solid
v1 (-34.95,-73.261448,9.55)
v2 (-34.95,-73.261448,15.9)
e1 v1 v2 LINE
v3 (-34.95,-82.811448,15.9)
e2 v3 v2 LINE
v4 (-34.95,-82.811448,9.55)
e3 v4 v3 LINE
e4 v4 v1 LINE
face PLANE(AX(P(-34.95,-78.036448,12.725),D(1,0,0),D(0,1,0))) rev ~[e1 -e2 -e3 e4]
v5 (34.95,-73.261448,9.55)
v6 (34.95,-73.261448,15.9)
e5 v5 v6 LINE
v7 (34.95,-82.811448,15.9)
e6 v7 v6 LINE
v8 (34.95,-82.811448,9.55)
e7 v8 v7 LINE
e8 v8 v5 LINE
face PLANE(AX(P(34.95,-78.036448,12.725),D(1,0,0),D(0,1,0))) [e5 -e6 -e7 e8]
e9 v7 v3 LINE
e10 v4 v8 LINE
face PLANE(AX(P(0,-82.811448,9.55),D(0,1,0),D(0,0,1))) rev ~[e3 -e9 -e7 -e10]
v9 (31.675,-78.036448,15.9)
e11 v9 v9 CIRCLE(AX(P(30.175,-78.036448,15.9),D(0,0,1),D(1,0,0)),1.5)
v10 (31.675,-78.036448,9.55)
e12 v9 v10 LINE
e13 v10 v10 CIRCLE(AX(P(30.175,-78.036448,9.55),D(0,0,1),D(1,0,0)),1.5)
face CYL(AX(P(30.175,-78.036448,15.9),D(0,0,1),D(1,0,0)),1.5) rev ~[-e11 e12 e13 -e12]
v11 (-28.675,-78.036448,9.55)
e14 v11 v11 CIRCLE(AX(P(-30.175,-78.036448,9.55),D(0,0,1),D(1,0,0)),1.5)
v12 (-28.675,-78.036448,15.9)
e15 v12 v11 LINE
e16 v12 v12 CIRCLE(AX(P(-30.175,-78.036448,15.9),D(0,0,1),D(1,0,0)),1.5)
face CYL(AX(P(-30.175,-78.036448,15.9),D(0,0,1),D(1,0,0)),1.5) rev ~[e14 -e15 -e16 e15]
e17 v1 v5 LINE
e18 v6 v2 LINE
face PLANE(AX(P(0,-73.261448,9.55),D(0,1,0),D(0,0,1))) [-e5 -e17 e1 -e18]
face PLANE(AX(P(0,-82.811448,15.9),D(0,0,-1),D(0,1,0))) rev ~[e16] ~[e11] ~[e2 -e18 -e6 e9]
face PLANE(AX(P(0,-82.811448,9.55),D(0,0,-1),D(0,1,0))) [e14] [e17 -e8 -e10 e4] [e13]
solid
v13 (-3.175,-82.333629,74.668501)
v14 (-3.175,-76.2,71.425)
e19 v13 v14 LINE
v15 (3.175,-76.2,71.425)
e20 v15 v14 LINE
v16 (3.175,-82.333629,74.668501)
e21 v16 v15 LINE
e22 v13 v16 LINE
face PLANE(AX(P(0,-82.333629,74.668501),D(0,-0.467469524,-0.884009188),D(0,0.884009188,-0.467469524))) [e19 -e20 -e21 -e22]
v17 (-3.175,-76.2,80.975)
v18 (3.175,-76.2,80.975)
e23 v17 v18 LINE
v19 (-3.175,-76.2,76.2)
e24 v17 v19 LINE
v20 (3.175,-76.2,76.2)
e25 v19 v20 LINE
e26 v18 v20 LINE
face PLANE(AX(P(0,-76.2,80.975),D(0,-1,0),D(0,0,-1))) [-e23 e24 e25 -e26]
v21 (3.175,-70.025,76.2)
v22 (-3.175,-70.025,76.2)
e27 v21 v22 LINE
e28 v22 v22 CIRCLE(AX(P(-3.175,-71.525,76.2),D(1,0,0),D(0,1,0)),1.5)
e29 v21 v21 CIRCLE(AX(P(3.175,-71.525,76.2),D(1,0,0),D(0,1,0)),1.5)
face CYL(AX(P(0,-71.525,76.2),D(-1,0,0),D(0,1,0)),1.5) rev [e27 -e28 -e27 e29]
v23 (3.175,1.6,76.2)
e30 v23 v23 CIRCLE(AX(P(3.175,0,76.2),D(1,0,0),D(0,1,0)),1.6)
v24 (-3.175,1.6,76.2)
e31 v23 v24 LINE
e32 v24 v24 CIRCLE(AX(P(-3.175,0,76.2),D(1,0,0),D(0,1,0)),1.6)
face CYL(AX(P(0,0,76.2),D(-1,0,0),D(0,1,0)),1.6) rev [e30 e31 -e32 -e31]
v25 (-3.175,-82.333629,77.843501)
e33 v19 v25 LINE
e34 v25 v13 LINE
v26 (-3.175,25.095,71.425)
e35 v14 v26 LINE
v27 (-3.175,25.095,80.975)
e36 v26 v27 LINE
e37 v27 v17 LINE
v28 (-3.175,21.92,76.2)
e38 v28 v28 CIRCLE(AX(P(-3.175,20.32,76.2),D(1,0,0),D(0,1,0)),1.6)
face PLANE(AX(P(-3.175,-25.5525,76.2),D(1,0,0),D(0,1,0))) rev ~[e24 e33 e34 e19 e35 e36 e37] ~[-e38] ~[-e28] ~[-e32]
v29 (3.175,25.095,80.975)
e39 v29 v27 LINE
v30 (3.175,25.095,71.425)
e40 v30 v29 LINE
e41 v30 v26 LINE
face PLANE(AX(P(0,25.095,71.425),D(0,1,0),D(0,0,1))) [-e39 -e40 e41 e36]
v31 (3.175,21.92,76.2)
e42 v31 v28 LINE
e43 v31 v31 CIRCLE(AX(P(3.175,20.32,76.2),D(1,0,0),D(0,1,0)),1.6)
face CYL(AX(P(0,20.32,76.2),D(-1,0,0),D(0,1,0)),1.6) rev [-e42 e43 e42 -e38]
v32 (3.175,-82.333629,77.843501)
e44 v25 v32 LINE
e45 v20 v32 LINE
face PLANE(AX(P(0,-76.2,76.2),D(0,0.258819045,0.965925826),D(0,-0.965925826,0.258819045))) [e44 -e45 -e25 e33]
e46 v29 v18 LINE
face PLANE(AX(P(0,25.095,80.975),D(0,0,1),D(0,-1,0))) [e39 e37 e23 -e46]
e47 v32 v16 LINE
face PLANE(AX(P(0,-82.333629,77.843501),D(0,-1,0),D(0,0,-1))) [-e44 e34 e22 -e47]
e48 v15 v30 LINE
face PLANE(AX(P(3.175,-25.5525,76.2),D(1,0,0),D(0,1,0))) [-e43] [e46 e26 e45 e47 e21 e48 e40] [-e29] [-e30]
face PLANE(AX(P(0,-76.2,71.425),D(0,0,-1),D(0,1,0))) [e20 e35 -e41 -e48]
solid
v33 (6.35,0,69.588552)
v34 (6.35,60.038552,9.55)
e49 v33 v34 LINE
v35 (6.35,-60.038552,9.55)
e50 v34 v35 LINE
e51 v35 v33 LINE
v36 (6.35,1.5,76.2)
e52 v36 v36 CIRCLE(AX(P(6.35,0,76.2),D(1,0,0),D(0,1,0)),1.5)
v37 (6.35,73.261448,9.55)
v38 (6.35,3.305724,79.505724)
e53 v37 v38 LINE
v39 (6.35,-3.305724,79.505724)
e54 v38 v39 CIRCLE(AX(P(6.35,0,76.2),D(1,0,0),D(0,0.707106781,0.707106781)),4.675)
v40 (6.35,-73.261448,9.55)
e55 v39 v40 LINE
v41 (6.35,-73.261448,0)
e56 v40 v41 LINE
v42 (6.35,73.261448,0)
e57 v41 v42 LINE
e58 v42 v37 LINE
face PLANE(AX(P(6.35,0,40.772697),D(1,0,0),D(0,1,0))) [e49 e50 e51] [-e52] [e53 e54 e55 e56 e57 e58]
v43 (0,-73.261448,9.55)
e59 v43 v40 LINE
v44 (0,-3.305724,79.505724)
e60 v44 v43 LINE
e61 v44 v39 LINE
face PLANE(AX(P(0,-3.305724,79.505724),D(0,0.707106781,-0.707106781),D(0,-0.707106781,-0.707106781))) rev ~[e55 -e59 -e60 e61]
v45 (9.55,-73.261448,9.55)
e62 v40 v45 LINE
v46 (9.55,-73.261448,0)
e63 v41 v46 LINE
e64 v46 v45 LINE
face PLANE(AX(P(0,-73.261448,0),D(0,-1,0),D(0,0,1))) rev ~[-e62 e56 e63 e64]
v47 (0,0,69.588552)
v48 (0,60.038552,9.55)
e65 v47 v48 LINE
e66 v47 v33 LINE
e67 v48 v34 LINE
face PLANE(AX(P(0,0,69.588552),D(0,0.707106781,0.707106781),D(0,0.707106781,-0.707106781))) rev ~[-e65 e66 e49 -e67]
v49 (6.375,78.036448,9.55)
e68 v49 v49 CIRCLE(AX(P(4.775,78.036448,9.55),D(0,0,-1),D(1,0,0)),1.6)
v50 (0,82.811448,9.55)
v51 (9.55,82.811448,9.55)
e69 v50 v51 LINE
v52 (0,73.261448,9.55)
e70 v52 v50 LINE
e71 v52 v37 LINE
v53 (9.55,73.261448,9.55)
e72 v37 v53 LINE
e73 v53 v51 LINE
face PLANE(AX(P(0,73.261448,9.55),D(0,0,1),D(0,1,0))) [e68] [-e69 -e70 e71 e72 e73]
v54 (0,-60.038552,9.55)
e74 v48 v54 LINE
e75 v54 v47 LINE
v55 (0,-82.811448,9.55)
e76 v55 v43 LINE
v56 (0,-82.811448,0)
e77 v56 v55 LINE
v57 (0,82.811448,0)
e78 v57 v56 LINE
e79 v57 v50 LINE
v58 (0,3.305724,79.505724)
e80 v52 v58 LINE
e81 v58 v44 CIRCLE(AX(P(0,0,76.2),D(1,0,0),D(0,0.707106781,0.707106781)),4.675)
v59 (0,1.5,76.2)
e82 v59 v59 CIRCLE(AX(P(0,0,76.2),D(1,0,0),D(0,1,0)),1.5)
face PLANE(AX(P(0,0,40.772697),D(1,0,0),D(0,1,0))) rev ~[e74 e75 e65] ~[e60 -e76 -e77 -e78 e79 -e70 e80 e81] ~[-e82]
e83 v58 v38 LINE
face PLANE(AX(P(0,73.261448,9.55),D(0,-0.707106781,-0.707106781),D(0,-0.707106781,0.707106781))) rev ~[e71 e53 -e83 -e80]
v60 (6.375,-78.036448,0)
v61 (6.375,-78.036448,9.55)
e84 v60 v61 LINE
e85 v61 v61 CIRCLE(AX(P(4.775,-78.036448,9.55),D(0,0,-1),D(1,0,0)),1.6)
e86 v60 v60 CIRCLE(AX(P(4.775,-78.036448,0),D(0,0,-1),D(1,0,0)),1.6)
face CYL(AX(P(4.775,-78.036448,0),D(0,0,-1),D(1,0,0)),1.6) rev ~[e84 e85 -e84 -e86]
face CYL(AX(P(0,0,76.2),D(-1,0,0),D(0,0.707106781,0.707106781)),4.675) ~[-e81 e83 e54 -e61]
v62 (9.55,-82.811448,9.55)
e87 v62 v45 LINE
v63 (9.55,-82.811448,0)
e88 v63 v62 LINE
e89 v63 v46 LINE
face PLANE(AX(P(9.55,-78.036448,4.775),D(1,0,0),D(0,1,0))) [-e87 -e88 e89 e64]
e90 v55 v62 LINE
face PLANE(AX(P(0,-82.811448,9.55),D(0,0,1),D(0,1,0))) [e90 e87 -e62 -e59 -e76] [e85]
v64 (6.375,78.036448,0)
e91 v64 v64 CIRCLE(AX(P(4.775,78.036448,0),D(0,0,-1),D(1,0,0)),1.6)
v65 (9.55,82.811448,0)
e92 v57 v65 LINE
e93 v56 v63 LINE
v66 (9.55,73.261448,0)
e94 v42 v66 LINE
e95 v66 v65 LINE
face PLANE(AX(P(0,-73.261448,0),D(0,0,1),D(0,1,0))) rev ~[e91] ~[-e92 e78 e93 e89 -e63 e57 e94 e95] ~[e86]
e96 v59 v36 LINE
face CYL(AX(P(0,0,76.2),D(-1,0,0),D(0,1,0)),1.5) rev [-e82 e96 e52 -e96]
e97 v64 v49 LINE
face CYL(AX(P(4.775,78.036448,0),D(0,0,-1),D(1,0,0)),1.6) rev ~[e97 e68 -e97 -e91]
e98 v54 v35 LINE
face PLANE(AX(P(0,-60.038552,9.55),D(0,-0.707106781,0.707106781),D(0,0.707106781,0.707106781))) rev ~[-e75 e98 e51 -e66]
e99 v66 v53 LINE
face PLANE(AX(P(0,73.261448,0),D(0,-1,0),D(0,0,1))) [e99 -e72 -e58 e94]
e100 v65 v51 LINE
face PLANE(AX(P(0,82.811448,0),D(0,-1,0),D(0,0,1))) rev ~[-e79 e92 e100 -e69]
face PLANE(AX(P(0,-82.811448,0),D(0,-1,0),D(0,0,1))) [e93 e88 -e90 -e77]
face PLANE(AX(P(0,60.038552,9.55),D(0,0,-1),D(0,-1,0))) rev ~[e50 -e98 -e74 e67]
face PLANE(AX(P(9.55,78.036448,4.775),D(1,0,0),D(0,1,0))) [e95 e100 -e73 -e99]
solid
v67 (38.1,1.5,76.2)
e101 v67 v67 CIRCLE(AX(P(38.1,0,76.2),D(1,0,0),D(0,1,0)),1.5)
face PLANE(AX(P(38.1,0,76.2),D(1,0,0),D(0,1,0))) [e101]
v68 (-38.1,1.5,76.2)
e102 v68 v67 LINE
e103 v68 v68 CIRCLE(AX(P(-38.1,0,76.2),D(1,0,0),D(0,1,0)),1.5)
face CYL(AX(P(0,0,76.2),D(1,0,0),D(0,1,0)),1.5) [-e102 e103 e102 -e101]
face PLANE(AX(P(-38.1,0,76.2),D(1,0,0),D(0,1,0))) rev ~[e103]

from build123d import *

# Parameters (mm, degrees)
F5_W      = 9.55
F5_H      = 9.55
F7_DEPTH  = 9.55
F5_R      = 1.5
F8_DEPTH  = 6.35
F5_H_2    = 6.35
F9_DEPTH  = 34.95
F10_R     = 1.5
F11_DEPTH = 6.35
F12_R     = 1.6
F13_DEPTH = 9.55
F6_R      = 1.5
F6_R_2    = 1.6
F14_DEPTH = 3.175
F15_DEPTH = 38.1


# Not quite as in the source:
# - a length typed as a fraction of an inch, garbled in the dataset ("3 / 203.2 mm" for 3/8 in), is restored


with BuildPart() as f7:
    # F5 (on Right) → F7 (new body)
    with BuildSketch(Plane.YZ):
        with Locations((-78.0364484041, 4.775)):
            Rectangle(F5_W, F5_H)
    extrude(amount=F7_DEPTH)



with BuildPart() as f7b:
    # F5 (on Right) → F7, piece 2 (new body)
    with BuildSketch(Plane.YZ):
        with Locations((78.0364484041, 4.775)):
            Rectangle(F5_W, F5_H)
    extrude(amount=F7_DEPTH)


with BuildPart() as f7_1:
    add(f7.part)

    add(f7b.part)  # F8 merges F7b
    # F5 (on Right) → F8 (join)
    with BuildSketch(Plane.YZ):
        with BuildLine():
            Line((-3.305724202, 79.505724202), (-73.2614484041, 9.55))
            Line((-73.2614484041, 9.55), (-60.0385515959, 9.55))
            Line((-60.0385515959, 9.55), (0, 69.5885515959))
            Line((0, 69.5885515959), (60.0385515959, 9.55))
            Line((60.0385515959, 9.55), (73.2614484041, 9.55))
            Line((73.2614484041, 9.55), (3.305724202, 79.505724202))
            ThreePointArc((3.305724202, 79.505724202), (0, 80.875), (-3.305724202, 79.505724202))
        make_face()
        with Locations((0, 76.2)):
            Circle(F5_R, mode=Mode.SUBTRACT)
        Polygon((-73.2614484041, 9.55), (-73.2614484041, 0), (73.2614484041, 0), (73.2614484041, 9.55), (60.0385515959, 9.55), (-60.0385515959, 9.55), align=None)
    extrude(amount=F8_DEPTH)

    # F12 (on face) → F13 (cut, through all)
    with BuildSketch(Plane(origin=(0, 0, 0), x_dir=(1, 0, 0), z_dir=(0, 0, -1))):
        with Locations((4.775, 78.0364484041)):
            Circle(F12_R)
        with Locations((4.775, -78.0364484041)):
            Circle(F12_R)
    extrude(amount=-F13_DEPTH, mode=Mode.SUBTRACT)


with BuildPart() as f9:
    # F5 (on Right) → F9 (new body, symmetric)
    with BuildSketch(Plane.YZ):
        with Locations((-78.0364484041, 12.725)):
            Rectangle(F5_W, F5_H_2)
    extrude(amount=F9_DEPTH, both=True)

    # F10 (on face) → F11 (cut, through all)
    with BuildSketch(Plane.XY.offset(15.9)):
        with Locations((30.175, -78.0364484041)):
            Circle(F10_R)
        with Locations((-30.175, -78.0364484041)):
            Circle(F10_R)
    extrude(amount=-F11_DEPTH, mode=Mode.SUBTRACT)


with BuildPart() as f14:
    # F6 (on Right) → F14 (new body, symmetric)
    with BuildSketch(Plane.YZ):
        Polygon((25.095, 80.975), (-76.2, 80.975), (-76.2, 76.2), (-76.2, 71.425), (25.095, 71.425), align=None)
        with Locations((-71.525, 76.2)):
            Circle(F6_R, mode=Mode.SUBTRACT)
        with Locations((0, 76.2)):
            Circle(F6_R_2, mode=Mode.SUBTRACT)
        with Locations((20.32, 76.2)):
            Circle(F6_R_2, mode=Mode.SUBTRACT)
        Polygon((-76.2, 71.425), (-76.2, 76.2), (-82.3336289969, 77.8435009364), (-82.3336289969, 74.6685009364), align=None)
    extrude(amount=F14_DEPTH, both=True)


with BuildPart() as f15:
    # F5 (on Right) → F15 (new body, symmetric)
    with BuildSketch(Plane.YZ):
        with Locations((0, 76.2)):
            Circle(F5_R)
    extrude(amount=F15_DEPTH, both=True)


solid = Compound([f7_1.part, f9.part, f14.part, f15.part])
